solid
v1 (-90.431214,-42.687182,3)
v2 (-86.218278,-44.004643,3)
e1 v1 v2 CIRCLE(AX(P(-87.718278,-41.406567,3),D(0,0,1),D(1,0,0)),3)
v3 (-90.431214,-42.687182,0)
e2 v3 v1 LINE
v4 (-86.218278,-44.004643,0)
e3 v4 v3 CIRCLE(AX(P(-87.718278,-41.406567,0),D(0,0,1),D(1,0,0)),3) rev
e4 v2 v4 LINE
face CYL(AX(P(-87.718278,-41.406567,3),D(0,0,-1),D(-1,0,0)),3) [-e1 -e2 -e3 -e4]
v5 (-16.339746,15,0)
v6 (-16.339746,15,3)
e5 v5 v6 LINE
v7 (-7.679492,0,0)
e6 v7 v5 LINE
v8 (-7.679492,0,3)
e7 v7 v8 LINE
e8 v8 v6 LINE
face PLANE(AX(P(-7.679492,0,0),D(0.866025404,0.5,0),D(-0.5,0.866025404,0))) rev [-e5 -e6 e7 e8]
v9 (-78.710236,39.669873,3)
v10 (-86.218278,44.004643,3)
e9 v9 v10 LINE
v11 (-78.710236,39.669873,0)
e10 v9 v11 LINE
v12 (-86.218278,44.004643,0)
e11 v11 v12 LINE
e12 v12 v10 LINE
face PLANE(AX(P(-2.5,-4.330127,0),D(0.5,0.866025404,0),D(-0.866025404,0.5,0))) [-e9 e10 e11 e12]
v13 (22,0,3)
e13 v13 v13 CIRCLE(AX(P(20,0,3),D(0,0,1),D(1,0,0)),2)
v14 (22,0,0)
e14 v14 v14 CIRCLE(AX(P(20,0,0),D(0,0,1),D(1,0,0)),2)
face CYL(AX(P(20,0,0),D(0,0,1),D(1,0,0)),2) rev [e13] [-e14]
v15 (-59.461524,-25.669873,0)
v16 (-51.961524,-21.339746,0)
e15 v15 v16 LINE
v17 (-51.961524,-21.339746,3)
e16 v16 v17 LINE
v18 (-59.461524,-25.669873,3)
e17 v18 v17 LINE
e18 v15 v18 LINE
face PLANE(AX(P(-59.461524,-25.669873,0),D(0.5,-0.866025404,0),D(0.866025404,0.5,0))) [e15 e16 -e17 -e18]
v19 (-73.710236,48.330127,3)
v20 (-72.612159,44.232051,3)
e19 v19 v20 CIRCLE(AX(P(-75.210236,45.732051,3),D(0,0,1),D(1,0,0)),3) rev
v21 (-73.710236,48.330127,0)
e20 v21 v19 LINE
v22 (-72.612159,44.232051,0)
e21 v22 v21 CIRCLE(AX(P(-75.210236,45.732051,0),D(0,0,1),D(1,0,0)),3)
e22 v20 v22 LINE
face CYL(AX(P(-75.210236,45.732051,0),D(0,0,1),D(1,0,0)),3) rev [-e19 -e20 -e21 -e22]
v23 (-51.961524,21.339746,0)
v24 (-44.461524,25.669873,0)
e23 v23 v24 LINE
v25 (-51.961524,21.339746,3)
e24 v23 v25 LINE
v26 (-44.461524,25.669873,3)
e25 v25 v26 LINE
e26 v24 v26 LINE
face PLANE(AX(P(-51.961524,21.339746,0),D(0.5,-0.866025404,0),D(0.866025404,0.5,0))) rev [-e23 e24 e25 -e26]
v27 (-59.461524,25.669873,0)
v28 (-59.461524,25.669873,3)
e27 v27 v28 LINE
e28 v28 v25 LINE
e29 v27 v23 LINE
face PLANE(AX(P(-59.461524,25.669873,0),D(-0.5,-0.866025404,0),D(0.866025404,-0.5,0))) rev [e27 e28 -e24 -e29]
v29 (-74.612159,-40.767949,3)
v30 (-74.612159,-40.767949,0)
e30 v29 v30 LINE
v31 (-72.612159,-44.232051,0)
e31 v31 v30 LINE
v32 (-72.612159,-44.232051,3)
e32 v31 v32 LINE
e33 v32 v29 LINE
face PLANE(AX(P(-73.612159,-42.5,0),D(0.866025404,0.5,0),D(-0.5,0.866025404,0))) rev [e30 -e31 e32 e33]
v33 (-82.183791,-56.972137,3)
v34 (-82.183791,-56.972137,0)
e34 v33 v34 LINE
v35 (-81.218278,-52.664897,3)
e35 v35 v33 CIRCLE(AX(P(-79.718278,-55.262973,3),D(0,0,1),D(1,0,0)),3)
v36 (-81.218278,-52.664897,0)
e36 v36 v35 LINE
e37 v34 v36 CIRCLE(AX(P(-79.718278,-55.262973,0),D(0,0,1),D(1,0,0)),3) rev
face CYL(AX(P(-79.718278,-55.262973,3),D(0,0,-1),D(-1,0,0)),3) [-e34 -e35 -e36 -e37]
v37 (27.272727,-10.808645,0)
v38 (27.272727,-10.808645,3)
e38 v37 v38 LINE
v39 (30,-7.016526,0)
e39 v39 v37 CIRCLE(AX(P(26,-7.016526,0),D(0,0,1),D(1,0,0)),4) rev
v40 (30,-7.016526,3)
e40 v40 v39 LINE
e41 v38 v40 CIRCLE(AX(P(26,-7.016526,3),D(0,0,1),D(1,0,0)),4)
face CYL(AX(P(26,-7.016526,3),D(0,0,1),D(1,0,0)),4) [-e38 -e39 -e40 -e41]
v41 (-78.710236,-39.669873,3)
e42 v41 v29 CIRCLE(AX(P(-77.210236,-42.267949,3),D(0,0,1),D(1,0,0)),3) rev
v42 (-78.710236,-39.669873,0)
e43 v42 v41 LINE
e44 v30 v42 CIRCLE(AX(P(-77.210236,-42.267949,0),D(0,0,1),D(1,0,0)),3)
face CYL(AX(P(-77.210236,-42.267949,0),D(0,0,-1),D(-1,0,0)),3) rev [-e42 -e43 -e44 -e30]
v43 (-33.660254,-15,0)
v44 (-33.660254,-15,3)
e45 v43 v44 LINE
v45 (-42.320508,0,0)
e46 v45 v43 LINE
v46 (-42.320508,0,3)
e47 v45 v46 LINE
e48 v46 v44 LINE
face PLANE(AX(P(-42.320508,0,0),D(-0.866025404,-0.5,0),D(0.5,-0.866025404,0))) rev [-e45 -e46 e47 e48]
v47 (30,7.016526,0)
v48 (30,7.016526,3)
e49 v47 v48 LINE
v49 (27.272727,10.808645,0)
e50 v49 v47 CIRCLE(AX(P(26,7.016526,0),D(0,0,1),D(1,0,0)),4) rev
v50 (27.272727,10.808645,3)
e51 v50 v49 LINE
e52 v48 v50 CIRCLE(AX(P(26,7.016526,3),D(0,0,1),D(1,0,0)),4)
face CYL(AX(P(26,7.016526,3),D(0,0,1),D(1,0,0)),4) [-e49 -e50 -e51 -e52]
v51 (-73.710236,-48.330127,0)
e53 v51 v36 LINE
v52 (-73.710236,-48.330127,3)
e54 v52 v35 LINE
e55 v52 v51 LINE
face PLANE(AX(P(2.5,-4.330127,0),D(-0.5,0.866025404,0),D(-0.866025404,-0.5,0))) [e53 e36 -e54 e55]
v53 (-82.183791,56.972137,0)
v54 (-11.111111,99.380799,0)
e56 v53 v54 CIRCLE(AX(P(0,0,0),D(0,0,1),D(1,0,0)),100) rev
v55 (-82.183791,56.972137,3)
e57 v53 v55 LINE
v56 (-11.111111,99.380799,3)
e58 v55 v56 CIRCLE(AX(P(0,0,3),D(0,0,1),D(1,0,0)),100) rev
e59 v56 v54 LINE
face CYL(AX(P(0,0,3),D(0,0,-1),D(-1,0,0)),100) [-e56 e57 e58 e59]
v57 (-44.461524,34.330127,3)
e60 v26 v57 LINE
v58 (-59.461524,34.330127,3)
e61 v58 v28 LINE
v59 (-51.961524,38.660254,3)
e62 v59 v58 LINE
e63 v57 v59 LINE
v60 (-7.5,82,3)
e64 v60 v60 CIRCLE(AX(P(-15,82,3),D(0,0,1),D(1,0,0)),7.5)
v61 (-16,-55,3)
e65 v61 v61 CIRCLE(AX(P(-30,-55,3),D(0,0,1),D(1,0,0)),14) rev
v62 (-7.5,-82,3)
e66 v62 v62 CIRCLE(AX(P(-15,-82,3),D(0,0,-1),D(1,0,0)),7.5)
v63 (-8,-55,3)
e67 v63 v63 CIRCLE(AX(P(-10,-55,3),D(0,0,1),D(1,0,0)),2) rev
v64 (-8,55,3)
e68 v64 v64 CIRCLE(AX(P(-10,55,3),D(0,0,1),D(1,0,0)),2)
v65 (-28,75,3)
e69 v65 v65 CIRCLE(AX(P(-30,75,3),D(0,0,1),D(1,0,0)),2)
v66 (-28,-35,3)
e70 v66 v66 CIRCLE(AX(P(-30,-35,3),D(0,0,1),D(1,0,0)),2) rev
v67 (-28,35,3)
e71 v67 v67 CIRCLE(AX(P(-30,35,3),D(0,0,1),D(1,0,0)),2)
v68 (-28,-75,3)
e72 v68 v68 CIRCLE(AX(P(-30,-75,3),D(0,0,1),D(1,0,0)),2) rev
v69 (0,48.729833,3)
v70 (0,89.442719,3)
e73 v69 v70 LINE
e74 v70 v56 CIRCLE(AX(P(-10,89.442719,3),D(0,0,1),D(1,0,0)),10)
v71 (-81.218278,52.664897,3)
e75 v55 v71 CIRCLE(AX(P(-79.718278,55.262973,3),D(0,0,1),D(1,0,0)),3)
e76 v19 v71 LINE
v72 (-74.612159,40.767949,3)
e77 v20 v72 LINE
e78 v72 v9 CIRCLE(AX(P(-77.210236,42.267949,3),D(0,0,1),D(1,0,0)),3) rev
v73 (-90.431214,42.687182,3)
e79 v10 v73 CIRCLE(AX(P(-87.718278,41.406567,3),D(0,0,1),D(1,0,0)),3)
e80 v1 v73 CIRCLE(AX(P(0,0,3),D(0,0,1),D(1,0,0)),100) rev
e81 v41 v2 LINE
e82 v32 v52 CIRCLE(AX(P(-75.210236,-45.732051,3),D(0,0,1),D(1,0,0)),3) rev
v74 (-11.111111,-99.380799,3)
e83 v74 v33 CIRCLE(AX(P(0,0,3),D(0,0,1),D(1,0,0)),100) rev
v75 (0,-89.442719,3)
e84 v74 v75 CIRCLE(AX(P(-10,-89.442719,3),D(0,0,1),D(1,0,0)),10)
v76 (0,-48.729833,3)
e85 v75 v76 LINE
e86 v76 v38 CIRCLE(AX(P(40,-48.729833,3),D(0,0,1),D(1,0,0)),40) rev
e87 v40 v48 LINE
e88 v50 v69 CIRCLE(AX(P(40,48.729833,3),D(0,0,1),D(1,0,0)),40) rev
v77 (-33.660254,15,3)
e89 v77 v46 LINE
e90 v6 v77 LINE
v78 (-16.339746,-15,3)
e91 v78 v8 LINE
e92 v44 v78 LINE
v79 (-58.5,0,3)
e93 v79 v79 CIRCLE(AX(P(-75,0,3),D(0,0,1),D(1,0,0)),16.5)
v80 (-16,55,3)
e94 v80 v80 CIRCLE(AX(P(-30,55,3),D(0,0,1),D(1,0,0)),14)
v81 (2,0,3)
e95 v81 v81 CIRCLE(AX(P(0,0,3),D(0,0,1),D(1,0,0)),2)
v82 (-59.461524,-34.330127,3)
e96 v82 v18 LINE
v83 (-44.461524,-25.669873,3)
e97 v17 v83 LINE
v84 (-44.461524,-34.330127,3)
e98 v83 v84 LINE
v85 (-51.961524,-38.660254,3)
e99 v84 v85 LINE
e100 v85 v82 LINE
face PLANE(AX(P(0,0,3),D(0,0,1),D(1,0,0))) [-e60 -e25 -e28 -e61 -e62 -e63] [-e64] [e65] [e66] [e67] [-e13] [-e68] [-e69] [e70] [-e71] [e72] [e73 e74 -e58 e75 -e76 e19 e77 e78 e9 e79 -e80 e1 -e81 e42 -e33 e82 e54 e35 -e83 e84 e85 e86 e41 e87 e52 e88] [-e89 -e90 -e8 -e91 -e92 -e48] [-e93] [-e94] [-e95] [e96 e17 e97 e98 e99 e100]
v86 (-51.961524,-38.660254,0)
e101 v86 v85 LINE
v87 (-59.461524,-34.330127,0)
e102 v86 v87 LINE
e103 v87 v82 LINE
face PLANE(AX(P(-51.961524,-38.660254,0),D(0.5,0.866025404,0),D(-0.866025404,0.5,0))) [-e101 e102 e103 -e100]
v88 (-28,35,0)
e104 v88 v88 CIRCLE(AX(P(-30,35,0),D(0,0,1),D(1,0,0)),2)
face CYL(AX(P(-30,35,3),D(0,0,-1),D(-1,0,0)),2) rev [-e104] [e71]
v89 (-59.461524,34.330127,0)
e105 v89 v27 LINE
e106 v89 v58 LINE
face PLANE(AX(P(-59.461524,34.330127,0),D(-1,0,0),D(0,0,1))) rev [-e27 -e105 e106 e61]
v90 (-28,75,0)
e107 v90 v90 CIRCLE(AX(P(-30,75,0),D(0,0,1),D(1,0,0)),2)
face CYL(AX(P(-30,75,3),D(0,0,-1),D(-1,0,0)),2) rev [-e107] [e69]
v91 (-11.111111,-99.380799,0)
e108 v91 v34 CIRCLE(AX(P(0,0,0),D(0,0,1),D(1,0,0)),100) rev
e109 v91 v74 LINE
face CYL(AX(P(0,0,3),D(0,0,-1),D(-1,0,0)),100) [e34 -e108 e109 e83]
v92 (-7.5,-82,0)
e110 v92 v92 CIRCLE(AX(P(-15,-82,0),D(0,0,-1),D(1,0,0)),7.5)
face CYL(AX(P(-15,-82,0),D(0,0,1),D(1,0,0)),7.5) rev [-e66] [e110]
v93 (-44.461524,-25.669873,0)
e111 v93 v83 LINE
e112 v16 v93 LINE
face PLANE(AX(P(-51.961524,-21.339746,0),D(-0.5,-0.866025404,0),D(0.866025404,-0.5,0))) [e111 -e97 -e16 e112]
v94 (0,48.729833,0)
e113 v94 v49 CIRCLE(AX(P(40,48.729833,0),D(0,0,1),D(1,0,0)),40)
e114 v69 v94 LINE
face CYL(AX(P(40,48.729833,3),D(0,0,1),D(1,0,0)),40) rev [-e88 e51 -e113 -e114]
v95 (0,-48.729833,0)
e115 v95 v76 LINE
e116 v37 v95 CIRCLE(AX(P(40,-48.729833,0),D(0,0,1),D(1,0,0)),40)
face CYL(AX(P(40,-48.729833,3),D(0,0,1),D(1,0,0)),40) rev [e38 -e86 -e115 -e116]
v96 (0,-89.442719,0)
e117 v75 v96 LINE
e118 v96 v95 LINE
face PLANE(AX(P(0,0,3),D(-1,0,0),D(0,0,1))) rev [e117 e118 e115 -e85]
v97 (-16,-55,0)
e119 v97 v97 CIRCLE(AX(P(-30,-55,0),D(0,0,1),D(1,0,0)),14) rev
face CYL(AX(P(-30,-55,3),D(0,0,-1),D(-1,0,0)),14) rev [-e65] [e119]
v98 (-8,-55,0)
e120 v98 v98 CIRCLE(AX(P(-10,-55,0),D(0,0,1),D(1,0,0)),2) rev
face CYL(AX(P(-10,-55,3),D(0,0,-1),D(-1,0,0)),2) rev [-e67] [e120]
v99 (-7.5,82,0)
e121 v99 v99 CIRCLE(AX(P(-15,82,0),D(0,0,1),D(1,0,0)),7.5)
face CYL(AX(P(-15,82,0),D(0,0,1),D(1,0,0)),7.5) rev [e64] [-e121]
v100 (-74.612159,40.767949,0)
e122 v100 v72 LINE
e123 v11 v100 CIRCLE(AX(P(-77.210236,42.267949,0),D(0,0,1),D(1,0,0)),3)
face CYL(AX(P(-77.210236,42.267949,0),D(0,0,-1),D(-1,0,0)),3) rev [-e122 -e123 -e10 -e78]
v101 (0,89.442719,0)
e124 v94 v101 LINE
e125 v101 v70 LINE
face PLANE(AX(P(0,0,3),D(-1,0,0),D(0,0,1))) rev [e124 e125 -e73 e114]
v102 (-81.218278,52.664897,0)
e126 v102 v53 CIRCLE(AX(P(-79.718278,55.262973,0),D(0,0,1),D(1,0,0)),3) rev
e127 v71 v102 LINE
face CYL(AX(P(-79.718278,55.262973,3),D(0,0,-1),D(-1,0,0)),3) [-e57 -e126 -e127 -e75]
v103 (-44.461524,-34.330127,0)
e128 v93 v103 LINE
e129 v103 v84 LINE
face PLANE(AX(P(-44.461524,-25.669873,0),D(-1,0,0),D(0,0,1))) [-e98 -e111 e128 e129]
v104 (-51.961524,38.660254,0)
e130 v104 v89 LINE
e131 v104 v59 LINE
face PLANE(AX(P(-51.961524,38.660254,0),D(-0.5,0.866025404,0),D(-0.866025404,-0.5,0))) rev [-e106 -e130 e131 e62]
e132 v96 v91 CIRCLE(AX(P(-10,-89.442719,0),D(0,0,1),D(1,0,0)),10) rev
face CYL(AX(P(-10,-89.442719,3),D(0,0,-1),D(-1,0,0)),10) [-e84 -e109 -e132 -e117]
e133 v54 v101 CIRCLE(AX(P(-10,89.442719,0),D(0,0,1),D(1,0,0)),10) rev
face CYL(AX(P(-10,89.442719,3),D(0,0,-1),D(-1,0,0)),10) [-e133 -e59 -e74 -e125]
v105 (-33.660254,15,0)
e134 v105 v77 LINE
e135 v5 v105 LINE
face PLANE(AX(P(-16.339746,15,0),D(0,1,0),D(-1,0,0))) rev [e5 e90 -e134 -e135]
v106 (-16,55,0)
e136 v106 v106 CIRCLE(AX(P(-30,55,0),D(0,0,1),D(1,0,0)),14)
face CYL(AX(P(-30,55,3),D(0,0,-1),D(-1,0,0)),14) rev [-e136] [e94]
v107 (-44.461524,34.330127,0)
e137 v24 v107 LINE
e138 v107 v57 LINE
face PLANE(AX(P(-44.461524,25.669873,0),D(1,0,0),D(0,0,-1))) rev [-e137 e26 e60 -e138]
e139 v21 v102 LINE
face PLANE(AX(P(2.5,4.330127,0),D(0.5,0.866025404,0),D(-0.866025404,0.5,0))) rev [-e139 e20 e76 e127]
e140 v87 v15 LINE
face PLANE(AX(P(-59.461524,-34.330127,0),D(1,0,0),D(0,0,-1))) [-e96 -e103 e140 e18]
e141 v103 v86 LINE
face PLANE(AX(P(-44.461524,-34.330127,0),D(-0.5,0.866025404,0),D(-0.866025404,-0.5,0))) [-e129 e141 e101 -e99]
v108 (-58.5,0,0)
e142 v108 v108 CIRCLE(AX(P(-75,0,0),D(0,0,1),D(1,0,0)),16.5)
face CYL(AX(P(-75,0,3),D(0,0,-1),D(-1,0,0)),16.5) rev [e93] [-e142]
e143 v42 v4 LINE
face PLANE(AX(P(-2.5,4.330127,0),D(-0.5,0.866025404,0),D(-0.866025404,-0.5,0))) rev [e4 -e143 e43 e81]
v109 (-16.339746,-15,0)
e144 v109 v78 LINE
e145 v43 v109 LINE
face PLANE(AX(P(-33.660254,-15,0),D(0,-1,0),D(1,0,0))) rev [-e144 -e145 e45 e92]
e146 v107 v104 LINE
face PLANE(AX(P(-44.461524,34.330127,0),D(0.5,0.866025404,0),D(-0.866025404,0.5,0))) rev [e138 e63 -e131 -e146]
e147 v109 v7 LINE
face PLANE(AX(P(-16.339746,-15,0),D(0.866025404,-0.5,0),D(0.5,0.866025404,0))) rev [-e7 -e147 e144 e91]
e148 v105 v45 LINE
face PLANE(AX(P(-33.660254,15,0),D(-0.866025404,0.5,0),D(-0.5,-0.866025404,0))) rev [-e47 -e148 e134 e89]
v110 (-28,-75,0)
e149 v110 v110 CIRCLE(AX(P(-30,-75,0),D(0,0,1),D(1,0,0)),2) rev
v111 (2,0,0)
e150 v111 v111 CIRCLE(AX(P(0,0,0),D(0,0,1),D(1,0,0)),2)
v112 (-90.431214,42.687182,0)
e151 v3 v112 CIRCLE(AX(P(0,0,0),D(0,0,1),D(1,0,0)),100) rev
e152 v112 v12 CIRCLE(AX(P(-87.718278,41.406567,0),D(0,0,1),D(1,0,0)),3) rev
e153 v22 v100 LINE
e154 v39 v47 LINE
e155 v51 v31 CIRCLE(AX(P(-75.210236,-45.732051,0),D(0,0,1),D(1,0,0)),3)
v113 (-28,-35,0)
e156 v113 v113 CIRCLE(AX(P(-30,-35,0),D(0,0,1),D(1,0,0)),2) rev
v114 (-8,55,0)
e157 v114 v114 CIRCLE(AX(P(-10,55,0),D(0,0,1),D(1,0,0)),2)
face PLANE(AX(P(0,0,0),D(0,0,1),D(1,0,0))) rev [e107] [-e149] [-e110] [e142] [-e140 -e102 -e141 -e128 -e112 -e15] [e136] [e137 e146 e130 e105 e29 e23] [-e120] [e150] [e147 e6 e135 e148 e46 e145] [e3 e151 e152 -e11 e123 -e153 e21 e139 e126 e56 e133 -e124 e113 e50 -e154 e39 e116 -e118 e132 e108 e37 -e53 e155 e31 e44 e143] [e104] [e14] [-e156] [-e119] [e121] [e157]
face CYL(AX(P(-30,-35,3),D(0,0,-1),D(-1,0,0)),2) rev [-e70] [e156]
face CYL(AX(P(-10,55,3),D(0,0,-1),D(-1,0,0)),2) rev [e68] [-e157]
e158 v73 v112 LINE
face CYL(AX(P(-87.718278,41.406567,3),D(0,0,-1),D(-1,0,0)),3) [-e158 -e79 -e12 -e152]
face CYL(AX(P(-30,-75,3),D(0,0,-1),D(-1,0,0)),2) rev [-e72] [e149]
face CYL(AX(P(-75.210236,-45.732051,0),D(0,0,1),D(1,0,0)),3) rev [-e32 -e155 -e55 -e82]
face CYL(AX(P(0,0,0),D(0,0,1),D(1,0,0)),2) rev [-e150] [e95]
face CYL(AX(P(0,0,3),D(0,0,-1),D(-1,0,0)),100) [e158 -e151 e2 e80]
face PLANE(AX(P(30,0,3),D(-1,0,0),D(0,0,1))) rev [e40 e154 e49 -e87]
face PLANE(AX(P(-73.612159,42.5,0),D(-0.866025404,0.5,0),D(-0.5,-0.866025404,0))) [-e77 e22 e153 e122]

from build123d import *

# Parameters (mm, degrees)
SKETCH_2_R             = 2
SKETCH_2_R_2           = 14
SKETCH_2_R_3           = 16.5
SKETCH_2_W             = 30
SKETCH_2_H             = 20
EXTRUDE_1_DEPTH        = 3
FILLET_1_R             = 40
FILLET_2_R             = 10
SKETCH_3_R             = 7.5
CUT_EXTRUDE_1_DEPTH    = 142.05975465
FILLET_3_R             = 3
FILLET_3_OF_MIRROR_1_R = 3
SKETCH_4_R             = 2
CUT_EXTRUDE_2_DEPTH    = 142.05975465
FILLET_4_R             = 4


with BuildPart() as part:
    # 草图2 → 凸台-拉伸1 (new body)
    # profile 1 of 2: a face of its own
    with BuildSketch(Plane.XY):
        with BuildLine():
            Line((0, 10), (0, 100))
            ThreePointArc((0, 100), (-100, 0), (0, -100))
            Line((0, -100), (0, -10))
            Line((0, -10), (0, 10))
        make_face()
        with Locations((-30, -75)):
            Circle(SKETCH_2_R, mode=Mode.SUBTRACT)
        with Locations((-30, -55)):
            Circle(SKETCH_2_R_2, mode=Mode.SUBTRACT)
        with Locations((-10, -55)):
            Circle(SKETCH_2_R, mode=Mode.SUBTRACT)
        with Locations((-30, -35)):
            Circle(SKETCH_2_R, mode=Mode.SUBTRACT)
        with Locations((-75, 0)):
            Circle(SKETCH_2_R_3, mode=Mode.SUBTRACT)
        with Locations((-30, 35)):
            Circle(SKETCH_2_R, mode=Mode.SUBTRACT)
        with Locations((-30, 55)):
            Circle(SKETCH_2_R_2, mode=Mode.SUBTRACT)
        with Locations((-10, 55)):
            Circle(SKETCH_2_R, mode=Mode.SUBTRACT)
        with Locations((-30, 75)):
            Circle(SKETCH_2_R, mode=Mode.SUBTRACT)
    # profile 2 of 2: a face of its own
    with BuildSketch(Plane.XY):
        with Locations((15, 0)):
            Rectangle(SKETCH_2_W, SKETCH_2_H)
    extrude(amount=EXTRUDE_1_DEPTH)

    # 圆角1
    # the kernel refuses this fillet: 40 mm, written as the material it adds along each edge
    with BuildSketch(Plane(origin=(0, 10, 0), x_dir=(0, 1, 0), z_dir=(0, 0, 1))) as fillet_1_piece_1:
        with BuildLine():
            CenterArc((38.729833462, -40), FILLET_1_R, 90, 75.522487814)
            Line((0, -30), (-0.774596669, -29.8))
            ThreePointArc((-0.774596669, -29.8), (-0.8, -15), (-0.8, 0))
            Line((-0.8, 0), (0, 0.8))
            Line((0, 0.8), (38.729833462, 0.8))
            Line((38.729833462, 0.8), (38.729833462, 0))
        make_face()
    extrude(amount=3)
    with BuildSketch(Plane(origin=(0, -10, 0), x_dir=(0, -1, 0), z_dir=(0, 0, 1))) as fillet_1_piece_2:
        with BuildLine():
            CenterArc((38.729833462, 40), FILLET_1_R, 194.477512186, 75.522487814)
            Line((0, 30), (-0.774596669, 29.8))
            ThreePointArc((-0.774596669, 29.8), (-0.8, 15), (-0.8, 0))
            Line((-0.8, 0), (0, -0.8))
            Line((0, -0.8), (38.729833462, -0.8))
            Line((38.729833462, -0.8), (38.729833462, 0))
        make_face()
    extrude(amount=3)

    # 圆角2
    fillet_2_edges = [part.edges().sort_by_distance(p)[0] for p in [
        (0, 100, 1.5),
        (0, -100, 1.5),
    ]]
    fillet(fillet_2_edges, radius=FILLET_2_R)

    # 草图3 → 切除-拉伸1 (cut, through all)
    with BuildSketch(Plane.XY.offset(3)):
        with BuildLine():
            Line((-76.112159322, 38.169872981), (-71.112159322, 46.830127019))
            Line((-71.112159322, 46.830127019), (-83.99421946, 54.267587908))
            ThreePointArc((-83.99421946, 54.267587908), (-86.602540378, 50), (-88.99421946, 45.60733387))
            Line((-88.99421946, 45.60733387), (-76.112159322, 38.169872981))
        make_face()
        Polygon((-42.320508076, 0), (-33.660254038, -15), (-16.339745962, -15), (-7.679491924, 0), (-16.339745962, 15), (-33.660254038, 15), align=None)
        Polygon((-59.461524227, 34.330127019), (-59.461524227, 25.669872981), (-51.961524227, 21.339745962), (-44.461524227, 25.669872981), (-44.461524227, 34.330127019), (-51.961524227, 38.660254038), align=None)
        with Locations((-15, 82)):
            Circle(SKETCH_3_R)
    cut_extrude_1 = extrude(amount=-CUT_EXTRUDE_1_DEPTH, mode=Mode.SUBTRACT)

    # 圆角3
    fillet_3_edges = [part.edges().sort_by_distance(p)[0] for p in [
        (-71.112159322, 46.830127019, 1.5),
        (-76.112159322, 38.169872981, 1.5),
        (-88.99421946, 45.60733387, 1.5),
        (-83.99421946, 54.267587908, 1.5),
    ]]
    fillet(fillet_3_edges, radius=FILLET_3_R)

    # 镜向1: 切除-拉伸1 across plane
    add(cut_extrude_1.mirror(Plane.ZX), mode=Mode.SUBTRACT)

    # 圆角3 of 镜向1
    fillet_3_of_mirror_1_edges = [part.edges().sort_by_distance(p)[0] for p in [
        (-71.112159322, -46.830127019, 1.5),
        (-76.112159322, -38.169872981, 1.5),
        (-88.99421946, -45.60733387, 1.5),
        (-83.99421946, -54.267587908, 1.5),
    ]]
    fillet(fillet_3_of_mirror_1_edges, radius=FILLET_3_OF_MIRROR_1_R)

    # 草图4 → 切除-拉伸2 (cut, through all)
    with BuildSketch(Plane.XY.offset(3)):
        with Locations((20, 0)):
            Circle(SKETCH_4_R)
        Circle(SKETCH_4_R)
    extrude(amount=-CUT_EXTRUDE_2_DEPTH, mode=Mode.SUBTRACT)

    # 圆角4
    fillet_4_edges = [part.edges().sort_by_distance(p)[0] for p in [
        (30, 10, 1.5),
        (30, -10, 1.5),
    ]]
    fillet(fillet_4_edges, radius=FILLET_4_R)


solid = part.part
